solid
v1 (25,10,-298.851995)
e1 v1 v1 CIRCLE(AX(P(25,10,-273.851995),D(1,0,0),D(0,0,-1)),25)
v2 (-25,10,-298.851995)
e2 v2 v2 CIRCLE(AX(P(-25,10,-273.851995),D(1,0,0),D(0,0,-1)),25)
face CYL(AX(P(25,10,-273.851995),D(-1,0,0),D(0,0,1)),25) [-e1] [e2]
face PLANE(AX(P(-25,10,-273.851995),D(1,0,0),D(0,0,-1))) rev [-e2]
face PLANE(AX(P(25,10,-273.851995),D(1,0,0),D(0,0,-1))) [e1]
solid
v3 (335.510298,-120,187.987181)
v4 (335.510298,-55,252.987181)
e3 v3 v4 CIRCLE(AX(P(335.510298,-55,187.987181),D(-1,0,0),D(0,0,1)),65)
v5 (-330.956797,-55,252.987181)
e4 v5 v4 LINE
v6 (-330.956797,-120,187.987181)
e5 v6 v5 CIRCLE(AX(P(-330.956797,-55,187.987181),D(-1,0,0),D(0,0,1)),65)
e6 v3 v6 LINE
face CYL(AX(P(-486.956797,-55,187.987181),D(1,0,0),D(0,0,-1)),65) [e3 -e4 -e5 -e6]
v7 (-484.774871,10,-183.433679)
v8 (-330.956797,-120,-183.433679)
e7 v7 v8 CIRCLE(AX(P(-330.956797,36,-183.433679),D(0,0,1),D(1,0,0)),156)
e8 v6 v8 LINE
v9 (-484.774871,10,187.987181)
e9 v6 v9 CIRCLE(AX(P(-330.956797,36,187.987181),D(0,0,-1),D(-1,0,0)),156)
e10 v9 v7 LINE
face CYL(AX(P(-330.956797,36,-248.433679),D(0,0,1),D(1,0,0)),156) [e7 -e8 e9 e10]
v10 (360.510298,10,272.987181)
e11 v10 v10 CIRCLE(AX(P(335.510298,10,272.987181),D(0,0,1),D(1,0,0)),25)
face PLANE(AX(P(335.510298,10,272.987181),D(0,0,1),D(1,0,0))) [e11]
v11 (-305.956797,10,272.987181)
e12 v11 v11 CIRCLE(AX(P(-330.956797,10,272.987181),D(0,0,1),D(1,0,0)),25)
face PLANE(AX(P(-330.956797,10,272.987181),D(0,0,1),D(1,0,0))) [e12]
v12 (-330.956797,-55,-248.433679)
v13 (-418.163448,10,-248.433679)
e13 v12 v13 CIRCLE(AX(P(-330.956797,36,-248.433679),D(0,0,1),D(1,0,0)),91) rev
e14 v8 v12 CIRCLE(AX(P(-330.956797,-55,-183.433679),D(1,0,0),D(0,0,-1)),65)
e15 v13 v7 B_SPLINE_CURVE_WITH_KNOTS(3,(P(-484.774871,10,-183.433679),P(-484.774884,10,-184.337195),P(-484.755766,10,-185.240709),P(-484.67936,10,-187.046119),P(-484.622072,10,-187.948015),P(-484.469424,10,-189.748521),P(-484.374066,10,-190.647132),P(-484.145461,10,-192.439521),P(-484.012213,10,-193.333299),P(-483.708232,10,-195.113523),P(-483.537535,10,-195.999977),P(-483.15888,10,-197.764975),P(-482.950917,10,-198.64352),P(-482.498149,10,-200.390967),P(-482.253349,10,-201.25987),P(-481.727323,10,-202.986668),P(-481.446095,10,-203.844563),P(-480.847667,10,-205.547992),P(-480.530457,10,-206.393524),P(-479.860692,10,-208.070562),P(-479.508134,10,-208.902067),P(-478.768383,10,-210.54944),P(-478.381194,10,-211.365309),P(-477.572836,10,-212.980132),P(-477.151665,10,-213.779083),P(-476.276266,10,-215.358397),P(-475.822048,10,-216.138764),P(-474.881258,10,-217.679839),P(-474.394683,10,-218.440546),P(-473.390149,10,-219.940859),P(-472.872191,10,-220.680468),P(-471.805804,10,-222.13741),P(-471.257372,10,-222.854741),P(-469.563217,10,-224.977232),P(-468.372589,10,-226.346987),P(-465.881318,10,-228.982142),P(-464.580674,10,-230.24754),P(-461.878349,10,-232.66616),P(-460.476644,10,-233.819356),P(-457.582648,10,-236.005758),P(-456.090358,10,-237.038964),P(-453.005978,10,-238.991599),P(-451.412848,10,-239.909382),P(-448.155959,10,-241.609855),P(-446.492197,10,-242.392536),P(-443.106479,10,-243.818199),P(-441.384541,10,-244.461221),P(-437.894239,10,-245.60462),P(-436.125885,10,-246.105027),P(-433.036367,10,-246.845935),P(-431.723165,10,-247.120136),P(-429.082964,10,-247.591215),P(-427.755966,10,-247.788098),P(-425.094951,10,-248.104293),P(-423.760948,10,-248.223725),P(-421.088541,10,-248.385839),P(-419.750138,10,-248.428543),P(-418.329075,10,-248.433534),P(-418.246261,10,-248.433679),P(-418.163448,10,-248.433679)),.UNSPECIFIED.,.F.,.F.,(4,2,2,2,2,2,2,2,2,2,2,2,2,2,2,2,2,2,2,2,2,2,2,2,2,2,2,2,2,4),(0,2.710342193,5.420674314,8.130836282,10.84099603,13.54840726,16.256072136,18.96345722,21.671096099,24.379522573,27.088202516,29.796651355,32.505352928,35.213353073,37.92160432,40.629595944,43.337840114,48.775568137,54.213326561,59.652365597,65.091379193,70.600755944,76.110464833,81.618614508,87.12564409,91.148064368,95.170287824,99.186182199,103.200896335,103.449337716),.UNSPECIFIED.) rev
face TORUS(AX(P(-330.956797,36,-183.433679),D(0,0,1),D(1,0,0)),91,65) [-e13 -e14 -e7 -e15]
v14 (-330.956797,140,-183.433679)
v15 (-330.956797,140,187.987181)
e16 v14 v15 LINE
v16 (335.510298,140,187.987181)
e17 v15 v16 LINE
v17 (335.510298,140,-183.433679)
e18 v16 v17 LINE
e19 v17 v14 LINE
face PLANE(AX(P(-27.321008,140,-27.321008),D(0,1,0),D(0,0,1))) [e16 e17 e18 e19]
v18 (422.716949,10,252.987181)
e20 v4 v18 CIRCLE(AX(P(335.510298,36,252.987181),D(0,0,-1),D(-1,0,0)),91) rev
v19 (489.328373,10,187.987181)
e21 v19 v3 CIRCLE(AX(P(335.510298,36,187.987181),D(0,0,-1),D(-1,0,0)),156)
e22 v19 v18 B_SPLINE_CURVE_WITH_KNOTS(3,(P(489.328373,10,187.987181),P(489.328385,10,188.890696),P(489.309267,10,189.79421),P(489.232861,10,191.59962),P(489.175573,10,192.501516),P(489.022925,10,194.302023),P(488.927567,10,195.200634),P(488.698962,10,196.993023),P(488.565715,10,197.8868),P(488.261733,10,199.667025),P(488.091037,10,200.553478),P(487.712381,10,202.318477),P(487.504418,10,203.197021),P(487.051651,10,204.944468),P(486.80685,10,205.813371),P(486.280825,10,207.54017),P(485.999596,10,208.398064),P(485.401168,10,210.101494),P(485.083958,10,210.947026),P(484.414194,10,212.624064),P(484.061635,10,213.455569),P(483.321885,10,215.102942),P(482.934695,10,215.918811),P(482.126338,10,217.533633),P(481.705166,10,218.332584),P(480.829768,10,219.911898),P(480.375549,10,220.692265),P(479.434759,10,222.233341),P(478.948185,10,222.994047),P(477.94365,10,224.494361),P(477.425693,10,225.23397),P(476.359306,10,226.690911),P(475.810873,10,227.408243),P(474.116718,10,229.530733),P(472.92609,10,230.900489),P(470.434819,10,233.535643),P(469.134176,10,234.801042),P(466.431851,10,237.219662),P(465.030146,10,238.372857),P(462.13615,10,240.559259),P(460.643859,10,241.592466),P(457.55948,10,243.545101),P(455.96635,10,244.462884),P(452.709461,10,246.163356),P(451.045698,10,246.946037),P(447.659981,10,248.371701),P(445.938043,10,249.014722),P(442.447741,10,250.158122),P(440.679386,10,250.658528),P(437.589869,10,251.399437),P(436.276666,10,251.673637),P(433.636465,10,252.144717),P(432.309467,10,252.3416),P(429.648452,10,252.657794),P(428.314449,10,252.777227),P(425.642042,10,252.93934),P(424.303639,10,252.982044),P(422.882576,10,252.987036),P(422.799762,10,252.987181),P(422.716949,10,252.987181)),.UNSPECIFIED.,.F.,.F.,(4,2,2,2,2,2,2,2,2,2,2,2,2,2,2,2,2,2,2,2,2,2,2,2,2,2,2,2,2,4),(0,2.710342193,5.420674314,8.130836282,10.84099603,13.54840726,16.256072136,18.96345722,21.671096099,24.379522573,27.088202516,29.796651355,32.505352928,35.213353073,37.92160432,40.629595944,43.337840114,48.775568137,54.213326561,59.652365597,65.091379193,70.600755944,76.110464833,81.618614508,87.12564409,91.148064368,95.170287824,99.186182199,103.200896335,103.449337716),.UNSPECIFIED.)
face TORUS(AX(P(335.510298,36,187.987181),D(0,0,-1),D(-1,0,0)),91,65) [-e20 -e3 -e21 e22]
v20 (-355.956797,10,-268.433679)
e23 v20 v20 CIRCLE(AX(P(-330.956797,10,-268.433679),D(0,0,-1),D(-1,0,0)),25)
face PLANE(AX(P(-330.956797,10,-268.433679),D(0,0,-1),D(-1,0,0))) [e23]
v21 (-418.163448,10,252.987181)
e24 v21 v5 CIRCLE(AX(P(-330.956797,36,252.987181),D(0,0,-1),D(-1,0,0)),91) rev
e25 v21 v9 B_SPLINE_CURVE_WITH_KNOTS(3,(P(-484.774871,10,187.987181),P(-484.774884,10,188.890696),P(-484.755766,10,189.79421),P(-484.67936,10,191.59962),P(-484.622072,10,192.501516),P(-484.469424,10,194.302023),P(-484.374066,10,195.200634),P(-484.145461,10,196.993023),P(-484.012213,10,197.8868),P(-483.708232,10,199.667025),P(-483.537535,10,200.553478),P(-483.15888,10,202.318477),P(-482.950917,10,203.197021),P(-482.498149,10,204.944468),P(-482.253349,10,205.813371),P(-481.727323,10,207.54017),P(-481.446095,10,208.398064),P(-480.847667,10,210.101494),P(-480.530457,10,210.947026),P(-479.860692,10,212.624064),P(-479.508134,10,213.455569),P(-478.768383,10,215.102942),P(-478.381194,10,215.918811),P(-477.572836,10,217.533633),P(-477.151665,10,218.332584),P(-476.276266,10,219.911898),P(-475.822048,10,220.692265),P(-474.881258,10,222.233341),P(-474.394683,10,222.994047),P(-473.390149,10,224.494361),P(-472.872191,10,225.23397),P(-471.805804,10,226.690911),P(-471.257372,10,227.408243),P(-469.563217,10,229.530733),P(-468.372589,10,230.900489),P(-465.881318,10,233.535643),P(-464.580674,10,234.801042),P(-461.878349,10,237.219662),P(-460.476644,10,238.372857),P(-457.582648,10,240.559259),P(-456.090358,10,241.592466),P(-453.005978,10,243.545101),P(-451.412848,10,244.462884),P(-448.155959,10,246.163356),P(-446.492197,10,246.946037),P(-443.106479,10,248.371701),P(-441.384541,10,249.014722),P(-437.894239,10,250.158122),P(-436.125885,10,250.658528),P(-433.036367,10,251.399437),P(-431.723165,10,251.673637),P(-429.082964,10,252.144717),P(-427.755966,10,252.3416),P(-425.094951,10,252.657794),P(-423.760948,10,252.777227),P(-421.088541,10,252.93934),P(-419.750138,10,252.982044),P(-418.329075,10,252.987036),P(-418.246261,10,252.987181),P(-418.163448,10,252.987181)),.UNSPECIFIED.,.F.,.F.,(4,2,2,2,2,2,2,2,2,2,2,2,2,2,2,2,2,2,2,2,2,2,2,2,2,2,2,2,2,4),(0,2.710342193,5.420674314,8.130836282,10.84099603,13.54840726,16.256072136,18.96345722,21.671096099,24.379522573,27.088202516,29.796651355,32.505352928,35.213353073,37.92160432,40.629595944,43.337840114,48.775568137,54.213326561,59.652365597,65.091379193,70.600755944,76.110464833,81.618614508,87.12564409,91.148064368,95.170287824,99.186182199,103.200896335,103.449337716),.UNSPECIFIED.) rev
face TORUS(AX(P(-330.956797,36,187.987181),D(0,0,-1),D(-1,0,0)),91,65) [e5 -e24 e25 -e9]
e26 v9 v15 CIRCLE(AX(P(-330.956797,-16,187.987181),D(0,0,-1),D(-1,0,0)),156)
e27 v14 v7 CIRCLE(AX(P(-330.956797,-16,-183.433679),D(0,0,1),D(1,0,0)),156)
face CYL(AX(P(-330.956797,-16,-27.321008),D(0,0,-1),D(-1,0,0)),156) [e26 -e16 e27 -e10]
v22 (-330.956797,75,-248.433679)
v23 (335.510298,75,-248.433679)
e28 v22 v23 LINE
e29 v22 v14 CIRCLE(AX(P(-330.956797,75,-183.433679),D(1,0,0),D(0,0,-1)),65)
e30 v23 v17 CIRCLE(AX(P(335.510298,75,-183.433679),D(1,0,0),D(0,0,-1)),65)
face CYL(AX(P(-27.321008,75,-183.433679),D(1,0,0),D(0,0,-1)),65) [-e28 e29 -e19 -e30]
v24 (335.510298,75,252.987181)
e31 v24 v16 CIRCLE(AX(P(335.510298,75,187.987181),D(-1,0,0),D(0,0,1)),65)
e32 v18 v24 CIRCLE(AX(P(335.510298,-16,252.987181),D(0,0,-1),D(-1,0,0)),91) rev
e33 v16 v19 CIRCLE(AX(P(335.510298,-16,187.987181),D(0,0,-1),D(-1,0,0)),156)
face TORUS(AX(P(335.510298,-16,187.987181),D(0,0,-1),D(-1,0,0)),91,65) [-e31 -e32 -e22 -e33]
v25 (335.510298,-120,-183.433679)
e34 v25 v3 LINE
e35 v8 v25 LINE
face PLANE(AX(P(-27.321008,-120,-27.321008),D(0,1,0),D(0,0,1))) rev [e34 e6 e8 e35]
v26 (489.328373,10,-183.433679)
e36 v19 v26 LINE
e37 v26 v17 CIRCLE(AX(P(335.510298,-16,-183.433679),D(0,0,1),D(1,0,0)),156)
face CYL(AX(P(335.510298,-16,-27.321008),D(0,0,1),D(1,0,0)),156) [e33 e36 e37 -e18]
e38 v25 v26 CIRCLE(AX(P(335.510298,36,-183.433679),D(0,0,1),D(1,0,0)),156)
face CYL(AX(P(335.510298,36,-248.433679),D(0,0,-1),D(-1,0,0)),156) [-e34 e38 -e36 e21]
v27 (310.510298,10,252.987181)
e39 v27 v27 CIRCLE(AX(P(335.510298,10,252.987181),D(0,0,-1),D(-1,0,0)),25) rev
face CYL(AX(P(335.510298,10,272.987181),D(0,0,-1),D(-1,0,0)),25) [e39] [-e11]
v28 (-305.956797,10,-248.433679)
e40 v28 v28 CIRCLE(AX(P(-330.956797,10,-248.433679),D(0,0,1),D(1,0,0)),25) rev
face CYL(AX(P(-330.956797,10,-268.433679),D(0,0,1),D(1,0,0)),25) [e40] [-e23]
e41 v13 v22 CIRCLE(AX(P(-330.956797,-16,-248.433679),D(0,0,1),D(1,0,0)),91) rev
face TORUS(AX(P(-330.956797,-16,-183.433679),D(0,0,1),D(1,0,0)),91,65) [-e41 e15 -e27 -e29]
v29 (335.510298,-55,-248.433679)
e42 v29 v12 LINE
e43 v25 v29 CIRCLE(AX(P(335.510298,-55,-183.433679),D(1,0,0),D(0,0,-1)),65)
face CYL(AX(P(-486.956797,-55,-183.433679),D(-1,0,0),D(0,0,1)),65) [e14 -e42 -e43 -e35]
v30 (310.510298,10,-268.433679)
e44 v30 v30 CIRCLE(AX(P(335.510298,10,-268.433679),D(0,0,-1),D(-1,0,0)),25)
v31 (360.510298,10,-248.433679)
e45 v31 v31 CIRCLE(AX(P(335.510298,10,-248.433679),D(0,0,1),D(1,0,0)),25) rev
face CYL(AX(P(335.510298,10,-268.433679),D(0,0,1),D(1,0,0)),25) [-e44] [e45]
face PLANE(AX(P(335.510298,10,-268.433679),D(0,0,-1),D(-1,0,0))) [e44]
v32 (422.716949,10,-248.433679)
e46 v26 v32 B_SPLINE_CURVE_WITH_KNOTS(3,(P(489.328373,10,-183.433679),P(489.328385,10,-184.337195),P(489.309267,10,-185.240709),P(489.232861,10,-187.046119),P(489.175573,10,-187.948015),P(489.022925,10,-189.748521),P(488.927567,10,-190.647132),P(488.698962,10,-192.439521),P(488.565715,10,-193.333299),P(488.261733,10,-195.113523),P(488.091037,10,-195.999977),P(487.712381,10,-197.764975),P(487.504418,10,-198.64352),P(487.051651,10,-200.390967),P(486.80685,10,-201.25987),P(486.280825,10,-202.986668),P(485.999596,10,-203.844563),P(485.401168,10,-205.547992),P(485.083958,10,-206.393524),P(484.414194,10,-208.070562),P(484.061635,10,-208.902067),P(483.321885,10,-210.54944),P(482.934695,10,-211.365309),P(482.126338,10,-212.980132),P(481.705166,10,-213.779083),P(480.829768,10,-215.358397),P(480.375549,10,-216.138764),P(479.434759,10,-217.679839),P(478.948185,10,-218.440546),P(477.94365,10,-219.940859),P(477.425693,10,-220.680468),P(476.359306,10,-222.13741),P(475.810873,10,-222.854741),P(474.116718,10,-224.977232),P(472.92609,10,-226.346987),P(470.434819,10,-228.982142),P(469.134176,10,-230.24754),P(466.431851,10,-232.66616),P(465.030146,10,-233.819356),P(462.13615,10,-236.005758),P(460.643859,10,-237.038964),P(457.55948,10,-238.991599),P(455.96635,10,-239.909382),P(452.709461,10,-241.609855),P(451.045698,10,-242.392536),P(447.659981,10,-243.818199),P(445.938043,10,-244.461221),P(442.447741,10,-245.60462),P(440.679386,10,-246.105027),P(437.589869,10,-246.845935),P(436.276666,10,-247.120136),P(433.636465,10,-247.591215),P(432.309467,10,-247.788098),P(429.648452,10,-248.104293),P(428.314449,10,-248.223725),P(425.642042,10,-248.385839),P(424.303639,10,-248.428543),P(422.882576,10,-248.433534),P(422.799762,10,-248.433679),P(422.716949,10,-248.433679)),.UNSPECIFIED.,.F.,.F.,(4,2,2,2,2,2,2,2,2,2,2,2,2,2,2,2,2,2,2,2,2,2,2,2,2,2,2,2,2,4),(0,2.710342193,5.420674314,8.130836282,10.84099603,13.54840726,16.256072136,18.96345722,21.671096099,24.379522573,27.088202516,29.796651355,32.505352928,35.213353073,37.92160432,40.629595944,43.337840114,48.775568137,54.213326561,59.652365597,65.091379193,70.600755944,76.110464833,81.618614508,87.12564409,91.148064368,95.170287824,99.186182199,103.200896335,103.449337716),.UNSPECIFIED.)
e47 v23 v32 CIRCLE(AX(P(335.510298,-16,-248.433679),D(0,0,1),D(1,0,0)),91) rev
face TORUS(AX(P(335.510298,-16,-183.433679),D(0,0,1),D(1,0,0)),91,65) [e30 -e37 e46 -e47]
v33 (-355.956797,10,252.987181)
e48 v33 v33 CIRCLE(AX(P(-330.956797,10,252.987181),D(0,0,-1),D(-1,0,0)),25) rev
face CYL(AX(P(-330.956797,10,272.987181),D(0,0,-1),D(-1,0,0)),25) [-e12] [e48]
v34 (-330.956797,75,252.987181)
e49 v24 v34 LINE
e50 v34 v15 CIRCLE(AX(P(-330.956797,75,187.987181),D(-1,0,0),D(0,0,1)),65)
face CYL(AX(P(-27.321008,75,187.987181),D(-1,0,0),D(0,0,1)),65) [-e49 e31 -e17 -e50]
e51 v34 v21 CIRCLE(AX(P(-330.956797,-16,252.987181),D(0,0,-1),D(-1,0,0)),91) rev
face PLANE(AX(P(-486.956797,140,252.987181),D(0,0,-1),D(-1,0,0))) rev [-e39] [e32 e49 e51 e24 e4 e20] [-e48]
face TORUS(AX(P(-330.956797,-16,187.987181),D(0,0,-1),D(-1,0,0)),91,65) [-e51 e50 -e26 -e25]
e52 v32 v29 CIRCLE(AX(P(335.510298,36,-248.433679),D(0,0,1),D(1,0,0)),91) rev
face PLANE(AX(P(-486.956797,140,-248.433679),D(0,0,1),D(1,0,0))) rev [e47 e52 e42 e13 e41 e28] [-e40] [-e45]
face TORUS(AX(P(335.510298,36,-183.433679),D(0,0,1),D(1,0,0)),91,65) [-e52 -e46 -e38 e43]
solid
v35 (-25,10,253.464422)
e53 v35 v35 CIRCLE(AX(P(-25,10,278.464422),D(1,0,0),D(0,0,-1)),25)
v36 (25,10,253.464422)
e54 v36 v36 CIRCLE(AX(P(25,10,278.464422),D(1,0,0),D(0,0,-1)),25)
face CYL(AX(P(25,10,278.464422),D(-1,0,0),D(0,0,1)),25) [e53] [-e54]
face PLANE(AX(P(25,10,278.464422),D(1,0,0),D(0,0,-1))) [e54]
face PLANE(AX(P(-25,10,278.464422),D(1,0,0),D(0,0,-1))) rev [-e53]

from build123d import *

# Parameters (mm, degrees)
SKETCH1_W             = 75.266699621
SKETCH1_H             = 38.570835393
BOSS_EXTRUDE1_DEPTH   = 20
FILLET1_R             = 12
FILLET3_R             = 5
SCALE1_SCALE          = 13
SKETCH2_R             = 25
BOSS_EXTRUDE2_DEPTH   = 20
BOSS_EXTRUDE3_START   = 20
SKETCH3_R             = 25
BOSS_EXTRUDE3_DEPTH   = 20
SKETCH6_R             = 25
BOSS_EXTRUDE5_DEPTH   = 25
BOSS_EXTRUDE5_2_DEPTH = 25


with BuildPart() as part:
    # Sketch1 → Boss-Extrude1 (new body)
    with BuildSketch(Plane(origin=(0, 0, 0), x_dir=(1, 0, 0), z_dir=(0, 1, 0))):
        with Locations((2.2767507, -2.2767507)):
            Rectangle(SKETCH1_W, SKETCH1_H)
    extrude(amount=BOSS_EXTRUDE1_DEPTH)

    # Fillet1
    # the kernel refuses this fillet: 12 mm, written as the material it takes off along each edge
    with BuildSketch(Plane(origin=(39.910100511, 20, -47.008666996), x_dir=(0, -1, 0), z_dir=(0, 0, 1)), Plane(origin=(-35.35659911, 20, 51.562168397), x_dir=(0, -1, 0), z_dir=(0, 0, -1))) as fillet1_piece_1:
        with BuildLine():
            CenterArc((FILLET1_R, -FILLET1_R), FILLET1_R, 90, 90)
            Line((0, -FILLET1_R), (0, 0))
            Line((0, 0), (FILLET1_R, 0))
        make_face()
    extrude(amount=98.570835393, mode=Mode.SUBTRACT)
    with BuildSketch(Plane(origin=(39.910100511, 0, -47.008666996), x_dir=(0, 1, 0), z_dir=(0, 0, 1)), Plane(origin=(-35.35659911, 0, 51.562168397), x_dir=(0, 1, 0), z_dir=(0, 0, -1))) as fillet1_piece_2:
        with BuildLine():
            CenterArc((FILLET1_R, FILLET1_R), FILLET1_R, 180, 90)
            Line((0, FILLET1_R), (0, 0))
            Line((0, 0), (FILLET1_R, 0))
        make_face()
    extrude(amount=98.570835393, mode=Mode.SUBTRACT)

    # Fillet3
    # the kernel refuses this fillet: 5 mm, written as the material it takes off along each edge
    with BuildSketch(Plane(origin=(27.910100511, 0, 21.562168397), x_dir=(0, 0, -1), z_dir=(-1, 0, 0)), Plane(origin=(-23.35659911, 20, -17.008666996), x_dir=(0, -1, 0), z_dir=(1, 0, 0))) as fillet3_piece_1:
        with BuildLine():
            CenterArc((FILLET3_R, -FILLET3_R), FILLET3_R, 90, 90)
            Line((0, -FILLET3_R), (0, 0))
            Line((0, 0), (FILLET3_R, 0))
        make_face()
    extrude(amount=51.266699621, mode=Mode.SUBTRACT)
    with BuildSketch(Plane(origin=(27.910100511, 20, 21.562168397), x_dir=(0, 0, -1), z_dir=(-1, 0, 0)), Plane(origin=(-23.35659911, 0, -17.008666996), x_dir=(0, 1, 0), z_dir=(1, 0, 0))) as fillet3_piece_2:
        with BuildLine():
            CenterArc((FILLET3_R, FILLET3_R), FILLET3_R, 180, 90)
            Line((0, FILLET3_R), (0, 0))
            Line((0, 0), (FILLET3_R, 0))
        make_face()
    extrude(amount=51.266699621, mode=Mode.SUBTRACT)
    with BuildSketch(Plane(origin=(27.910100511, 12, 21.562168397), x_dir=(0.6413402265128234, 0.7672566153878899, 0), z_dir=(-0.7672566153878899, 0.6413402265128234, 0))) as fillet3_piece_3:
        with BuildLine():
            CenterArc((12 - FILLET3_R, FILLET3_R), FILLET3_R, 270, 90)
            Line((12 - FILLET3_R, 0), (12, 0))
            Line((12, 0), (12, FILLET3_R))
        make_face()
    revolve(axis=Axis((27.910100511, 12, 21.562168397), (0, 0, -1)), revolution_arc=140.108170437, mode=Mode.SUBTRACT)
    with BuildSketch(Plane(origin=(27.910100511, 8, 21.562168397), x_dir=(0, 1, 0), z_dir=(-1, 0, 0))) as fillet3_piece_4:
        with BuildLine():
            CenterArc((12 - FILLET3_R, FILLET3_R), FILLET3_R, 270, 90)
            Line((12 - FILLET3_R, 0), (12, 0))
            Line((12, 0), (12, FILLET3_R))
        make_face()
    revolve(axis=Axis((27.910100511, 8, 21.562168397), (0, 0, -1)), revolution_arc=140.108170437, mode=Mode.SUBTRACT)
    with BuildSketch(Plane(origin=(-23.35659911, 8, 21.562168397), x_dir=(0, 1, 0), z_dir=(1, 0, 0))) as fillet3_piece_5:
        with BuildLine():
            CenterArc((12 - FILLET3_R, -FILLET3_R), FILLET3_R, 0, 90)
            Line((12 - FILLET3_R, 0), (12, 0))
            Line((12, 0), (12, -FILLET3_R))
        make_face()
    revolve(axis=Axis((-23.35659911, 8, 21.562168397), (0, 0, 1)), revolution_arc=140.108170437, mode=Mode.SUBTRACT)
    with BuildSketch(Plane(origin=(-23.35659911, 12, 21.562168397), x_dir=(-0.6413402265128229, 0.7672566153878903, 0), z_dir=(0.7672566153878903, 0.6413402265128229, 0))) as fillet3_piece_6:
        with BuildLine():
            CenterArc((12 - FILLET3_R, -FILLET3_R), FILLET3_R, 0, 90)
            Line((12 - FILLET3_R, 0), (12, 0))
            Line((12, 0), (12, -FILLET3_R))
        make_face()
    revolve(axis=Axis((-23.35659911, 12, 21.562168397), (0, 0, 1)), revolution_arc=140.108170437, mode=Mode.SUBTRACT)
    with BuildSketch(Plane(origin=(27.910100511, 12, -17.008666996), x_dir=(0.6413402265128234, 0.7672566153878899, 0), z_dir=(-0.7672566153878899, 0.6413402265128234, 0))) as fillet3_piece_7:
        with BuildLine():
            CenterArc((12 - FILLET3_R, -FILLET3_R), FILLET3_R, 0, 90)
            Line((12, -FILLET3_R), (12, 0))
            Line((12, 0), (12 - FILLET3_R, 0))
        make_face()
    revolve(axis=Axis((27.910100511, 12, -17.008666996), (0, 0, -1)), revolution_arc=140.108170437, mode=Mode.SUBTRACT)
    with BuildSketch(Plane(origin=(27.910100511, 8, -17.008666996), x_dir=(0, 1, 0), z_dir=(-1, 0, 0))) as fillet3_piece_8:
        with BuildLine():
            CenterArc((12 - FILLET3_R, -FILLET3_R), FILLET3_R, 0, 90)
            Line((12, -FILLET3_R), (12, 0))
            Line((12, 0), (12 - FILLET3_R, 0))
        make_face()
    revolve(axis=Axis((27.910100511, 8, -17.008666996), (0, 0, -1)), revolution_arc=140.108170437, mode=Mode.SUBTRACT)
    with BuildSketch(Plane(origin=(-23.35659911, 8, -17.008666996), x_dir=(0, 1, 0), z_dir=(1, 0, 0))) as fillet3_piece_9:
        with BuildLine():
            CenterArc((12 - FILLET3_R, FILLET3_R), FILLET3_R, 270, 90)
            Line((12, FILLET3_R), (12, 0))
            Line((12, 0), (12 - FILLET3_R, 0))
        make_face()
    revolve(axis=Axis((-23.35659911, 8, -17.008666996), (0, 0, 1)), revolution_arc=140.108170437, mode=Mode.SUBTRACT)
    with BuildSketch(Plane(origin=(-23.35659911, 12, -17.008666996), x_dir=(-0.6413402265128236, 0.7672566153878898, 0), z_dir=(0.7672566153878898, 0.6413402265128236, 0))) as fillet3_piece_10:
        with BuildLine():
            CenterArc((12 - FILLET3_R, FILLET3_R), FILLET3_R, 270, 90)
            Line((12, FILLET3_R), (12, 0))
            Line((12, 0), (12 - FILLET3_R, 0))
        make_face()
    revolve(axis=Axis((-23.35659911, 12, -17.008666996), (0, 0, 1)), revolution_arc=140.108170437, mode=Mode.SUBTRACT)


with BuildPart() as part_1:
    # Scale1: scaled about (2.276750701, 9.999999998, 2.2767507)
    add(part.part.scale(SCALE1_SCALE).moved(Location((-27.321008412, -119.999999976, -27.3210084))))

    # Sketch2 → Boss-Extrude2 (add)
    with BuildSketch(Plane.XY.offset(252.987180755)):
        with Locations(Location((-330.956796836, 10, 0), (0, 0, 180))):
            Circle(SKETCH2_R)
        with Locations(Location((335.510298237, 10, 0), (0, 0, 180))):
            Circle(SKETCH2_R)
    extrude(amount=BOSS_EXTRUDE2_DEPTH)

    # Sketch3 → Boss-Extrude3 (add)
    with BuildSketch(Plane(origin=(0, 0, -248.433679354), x_dir=(-1, 0, 0), z_dir=(0, 0, -1)).offset(BOSS_EXTRUDE3_START)):
        with Locations((-335.510298237, 10)):
            Circle(SKETCH3_R)
        with Locations((330.956796836, 10)):
            Circle(SKETCH3_R)
    extrude(amount=-BOSS_EXTRUDE3_DEPTH)


with BuildPart() as body_2:
    # Sketch6 → Boss-Extrude5 (new, symmetric)
    with BuildSketch(Plane(origin=(0, 0, 0), x_dir=(0, 0, -1), z_dir=(1, 0, 0))):
        with Locations((-278.464422179, 10)):
            Circle(SKETCH6_R)
    extrude(amount=BOSS_EXTRUDE5_DEPTH, both=True)


with BuildPart() as body_3:
    # Sketch6 → Boss-Extrude5 2 (new, symmetric)
    with BuildSketch(Plane(origin=(0, 0, 0), x_dir=(0, 0, -1), z_dir=(1, 0, 0))):
        with Locations((273.851995382, 10)):
            Circle(SKETCH6_R)
    extrude(amount=BOSS_EXTRUDE5_2_DEPTH, both=True)


solid = Compound([part_1.part, body_2.part, body_3.part])
